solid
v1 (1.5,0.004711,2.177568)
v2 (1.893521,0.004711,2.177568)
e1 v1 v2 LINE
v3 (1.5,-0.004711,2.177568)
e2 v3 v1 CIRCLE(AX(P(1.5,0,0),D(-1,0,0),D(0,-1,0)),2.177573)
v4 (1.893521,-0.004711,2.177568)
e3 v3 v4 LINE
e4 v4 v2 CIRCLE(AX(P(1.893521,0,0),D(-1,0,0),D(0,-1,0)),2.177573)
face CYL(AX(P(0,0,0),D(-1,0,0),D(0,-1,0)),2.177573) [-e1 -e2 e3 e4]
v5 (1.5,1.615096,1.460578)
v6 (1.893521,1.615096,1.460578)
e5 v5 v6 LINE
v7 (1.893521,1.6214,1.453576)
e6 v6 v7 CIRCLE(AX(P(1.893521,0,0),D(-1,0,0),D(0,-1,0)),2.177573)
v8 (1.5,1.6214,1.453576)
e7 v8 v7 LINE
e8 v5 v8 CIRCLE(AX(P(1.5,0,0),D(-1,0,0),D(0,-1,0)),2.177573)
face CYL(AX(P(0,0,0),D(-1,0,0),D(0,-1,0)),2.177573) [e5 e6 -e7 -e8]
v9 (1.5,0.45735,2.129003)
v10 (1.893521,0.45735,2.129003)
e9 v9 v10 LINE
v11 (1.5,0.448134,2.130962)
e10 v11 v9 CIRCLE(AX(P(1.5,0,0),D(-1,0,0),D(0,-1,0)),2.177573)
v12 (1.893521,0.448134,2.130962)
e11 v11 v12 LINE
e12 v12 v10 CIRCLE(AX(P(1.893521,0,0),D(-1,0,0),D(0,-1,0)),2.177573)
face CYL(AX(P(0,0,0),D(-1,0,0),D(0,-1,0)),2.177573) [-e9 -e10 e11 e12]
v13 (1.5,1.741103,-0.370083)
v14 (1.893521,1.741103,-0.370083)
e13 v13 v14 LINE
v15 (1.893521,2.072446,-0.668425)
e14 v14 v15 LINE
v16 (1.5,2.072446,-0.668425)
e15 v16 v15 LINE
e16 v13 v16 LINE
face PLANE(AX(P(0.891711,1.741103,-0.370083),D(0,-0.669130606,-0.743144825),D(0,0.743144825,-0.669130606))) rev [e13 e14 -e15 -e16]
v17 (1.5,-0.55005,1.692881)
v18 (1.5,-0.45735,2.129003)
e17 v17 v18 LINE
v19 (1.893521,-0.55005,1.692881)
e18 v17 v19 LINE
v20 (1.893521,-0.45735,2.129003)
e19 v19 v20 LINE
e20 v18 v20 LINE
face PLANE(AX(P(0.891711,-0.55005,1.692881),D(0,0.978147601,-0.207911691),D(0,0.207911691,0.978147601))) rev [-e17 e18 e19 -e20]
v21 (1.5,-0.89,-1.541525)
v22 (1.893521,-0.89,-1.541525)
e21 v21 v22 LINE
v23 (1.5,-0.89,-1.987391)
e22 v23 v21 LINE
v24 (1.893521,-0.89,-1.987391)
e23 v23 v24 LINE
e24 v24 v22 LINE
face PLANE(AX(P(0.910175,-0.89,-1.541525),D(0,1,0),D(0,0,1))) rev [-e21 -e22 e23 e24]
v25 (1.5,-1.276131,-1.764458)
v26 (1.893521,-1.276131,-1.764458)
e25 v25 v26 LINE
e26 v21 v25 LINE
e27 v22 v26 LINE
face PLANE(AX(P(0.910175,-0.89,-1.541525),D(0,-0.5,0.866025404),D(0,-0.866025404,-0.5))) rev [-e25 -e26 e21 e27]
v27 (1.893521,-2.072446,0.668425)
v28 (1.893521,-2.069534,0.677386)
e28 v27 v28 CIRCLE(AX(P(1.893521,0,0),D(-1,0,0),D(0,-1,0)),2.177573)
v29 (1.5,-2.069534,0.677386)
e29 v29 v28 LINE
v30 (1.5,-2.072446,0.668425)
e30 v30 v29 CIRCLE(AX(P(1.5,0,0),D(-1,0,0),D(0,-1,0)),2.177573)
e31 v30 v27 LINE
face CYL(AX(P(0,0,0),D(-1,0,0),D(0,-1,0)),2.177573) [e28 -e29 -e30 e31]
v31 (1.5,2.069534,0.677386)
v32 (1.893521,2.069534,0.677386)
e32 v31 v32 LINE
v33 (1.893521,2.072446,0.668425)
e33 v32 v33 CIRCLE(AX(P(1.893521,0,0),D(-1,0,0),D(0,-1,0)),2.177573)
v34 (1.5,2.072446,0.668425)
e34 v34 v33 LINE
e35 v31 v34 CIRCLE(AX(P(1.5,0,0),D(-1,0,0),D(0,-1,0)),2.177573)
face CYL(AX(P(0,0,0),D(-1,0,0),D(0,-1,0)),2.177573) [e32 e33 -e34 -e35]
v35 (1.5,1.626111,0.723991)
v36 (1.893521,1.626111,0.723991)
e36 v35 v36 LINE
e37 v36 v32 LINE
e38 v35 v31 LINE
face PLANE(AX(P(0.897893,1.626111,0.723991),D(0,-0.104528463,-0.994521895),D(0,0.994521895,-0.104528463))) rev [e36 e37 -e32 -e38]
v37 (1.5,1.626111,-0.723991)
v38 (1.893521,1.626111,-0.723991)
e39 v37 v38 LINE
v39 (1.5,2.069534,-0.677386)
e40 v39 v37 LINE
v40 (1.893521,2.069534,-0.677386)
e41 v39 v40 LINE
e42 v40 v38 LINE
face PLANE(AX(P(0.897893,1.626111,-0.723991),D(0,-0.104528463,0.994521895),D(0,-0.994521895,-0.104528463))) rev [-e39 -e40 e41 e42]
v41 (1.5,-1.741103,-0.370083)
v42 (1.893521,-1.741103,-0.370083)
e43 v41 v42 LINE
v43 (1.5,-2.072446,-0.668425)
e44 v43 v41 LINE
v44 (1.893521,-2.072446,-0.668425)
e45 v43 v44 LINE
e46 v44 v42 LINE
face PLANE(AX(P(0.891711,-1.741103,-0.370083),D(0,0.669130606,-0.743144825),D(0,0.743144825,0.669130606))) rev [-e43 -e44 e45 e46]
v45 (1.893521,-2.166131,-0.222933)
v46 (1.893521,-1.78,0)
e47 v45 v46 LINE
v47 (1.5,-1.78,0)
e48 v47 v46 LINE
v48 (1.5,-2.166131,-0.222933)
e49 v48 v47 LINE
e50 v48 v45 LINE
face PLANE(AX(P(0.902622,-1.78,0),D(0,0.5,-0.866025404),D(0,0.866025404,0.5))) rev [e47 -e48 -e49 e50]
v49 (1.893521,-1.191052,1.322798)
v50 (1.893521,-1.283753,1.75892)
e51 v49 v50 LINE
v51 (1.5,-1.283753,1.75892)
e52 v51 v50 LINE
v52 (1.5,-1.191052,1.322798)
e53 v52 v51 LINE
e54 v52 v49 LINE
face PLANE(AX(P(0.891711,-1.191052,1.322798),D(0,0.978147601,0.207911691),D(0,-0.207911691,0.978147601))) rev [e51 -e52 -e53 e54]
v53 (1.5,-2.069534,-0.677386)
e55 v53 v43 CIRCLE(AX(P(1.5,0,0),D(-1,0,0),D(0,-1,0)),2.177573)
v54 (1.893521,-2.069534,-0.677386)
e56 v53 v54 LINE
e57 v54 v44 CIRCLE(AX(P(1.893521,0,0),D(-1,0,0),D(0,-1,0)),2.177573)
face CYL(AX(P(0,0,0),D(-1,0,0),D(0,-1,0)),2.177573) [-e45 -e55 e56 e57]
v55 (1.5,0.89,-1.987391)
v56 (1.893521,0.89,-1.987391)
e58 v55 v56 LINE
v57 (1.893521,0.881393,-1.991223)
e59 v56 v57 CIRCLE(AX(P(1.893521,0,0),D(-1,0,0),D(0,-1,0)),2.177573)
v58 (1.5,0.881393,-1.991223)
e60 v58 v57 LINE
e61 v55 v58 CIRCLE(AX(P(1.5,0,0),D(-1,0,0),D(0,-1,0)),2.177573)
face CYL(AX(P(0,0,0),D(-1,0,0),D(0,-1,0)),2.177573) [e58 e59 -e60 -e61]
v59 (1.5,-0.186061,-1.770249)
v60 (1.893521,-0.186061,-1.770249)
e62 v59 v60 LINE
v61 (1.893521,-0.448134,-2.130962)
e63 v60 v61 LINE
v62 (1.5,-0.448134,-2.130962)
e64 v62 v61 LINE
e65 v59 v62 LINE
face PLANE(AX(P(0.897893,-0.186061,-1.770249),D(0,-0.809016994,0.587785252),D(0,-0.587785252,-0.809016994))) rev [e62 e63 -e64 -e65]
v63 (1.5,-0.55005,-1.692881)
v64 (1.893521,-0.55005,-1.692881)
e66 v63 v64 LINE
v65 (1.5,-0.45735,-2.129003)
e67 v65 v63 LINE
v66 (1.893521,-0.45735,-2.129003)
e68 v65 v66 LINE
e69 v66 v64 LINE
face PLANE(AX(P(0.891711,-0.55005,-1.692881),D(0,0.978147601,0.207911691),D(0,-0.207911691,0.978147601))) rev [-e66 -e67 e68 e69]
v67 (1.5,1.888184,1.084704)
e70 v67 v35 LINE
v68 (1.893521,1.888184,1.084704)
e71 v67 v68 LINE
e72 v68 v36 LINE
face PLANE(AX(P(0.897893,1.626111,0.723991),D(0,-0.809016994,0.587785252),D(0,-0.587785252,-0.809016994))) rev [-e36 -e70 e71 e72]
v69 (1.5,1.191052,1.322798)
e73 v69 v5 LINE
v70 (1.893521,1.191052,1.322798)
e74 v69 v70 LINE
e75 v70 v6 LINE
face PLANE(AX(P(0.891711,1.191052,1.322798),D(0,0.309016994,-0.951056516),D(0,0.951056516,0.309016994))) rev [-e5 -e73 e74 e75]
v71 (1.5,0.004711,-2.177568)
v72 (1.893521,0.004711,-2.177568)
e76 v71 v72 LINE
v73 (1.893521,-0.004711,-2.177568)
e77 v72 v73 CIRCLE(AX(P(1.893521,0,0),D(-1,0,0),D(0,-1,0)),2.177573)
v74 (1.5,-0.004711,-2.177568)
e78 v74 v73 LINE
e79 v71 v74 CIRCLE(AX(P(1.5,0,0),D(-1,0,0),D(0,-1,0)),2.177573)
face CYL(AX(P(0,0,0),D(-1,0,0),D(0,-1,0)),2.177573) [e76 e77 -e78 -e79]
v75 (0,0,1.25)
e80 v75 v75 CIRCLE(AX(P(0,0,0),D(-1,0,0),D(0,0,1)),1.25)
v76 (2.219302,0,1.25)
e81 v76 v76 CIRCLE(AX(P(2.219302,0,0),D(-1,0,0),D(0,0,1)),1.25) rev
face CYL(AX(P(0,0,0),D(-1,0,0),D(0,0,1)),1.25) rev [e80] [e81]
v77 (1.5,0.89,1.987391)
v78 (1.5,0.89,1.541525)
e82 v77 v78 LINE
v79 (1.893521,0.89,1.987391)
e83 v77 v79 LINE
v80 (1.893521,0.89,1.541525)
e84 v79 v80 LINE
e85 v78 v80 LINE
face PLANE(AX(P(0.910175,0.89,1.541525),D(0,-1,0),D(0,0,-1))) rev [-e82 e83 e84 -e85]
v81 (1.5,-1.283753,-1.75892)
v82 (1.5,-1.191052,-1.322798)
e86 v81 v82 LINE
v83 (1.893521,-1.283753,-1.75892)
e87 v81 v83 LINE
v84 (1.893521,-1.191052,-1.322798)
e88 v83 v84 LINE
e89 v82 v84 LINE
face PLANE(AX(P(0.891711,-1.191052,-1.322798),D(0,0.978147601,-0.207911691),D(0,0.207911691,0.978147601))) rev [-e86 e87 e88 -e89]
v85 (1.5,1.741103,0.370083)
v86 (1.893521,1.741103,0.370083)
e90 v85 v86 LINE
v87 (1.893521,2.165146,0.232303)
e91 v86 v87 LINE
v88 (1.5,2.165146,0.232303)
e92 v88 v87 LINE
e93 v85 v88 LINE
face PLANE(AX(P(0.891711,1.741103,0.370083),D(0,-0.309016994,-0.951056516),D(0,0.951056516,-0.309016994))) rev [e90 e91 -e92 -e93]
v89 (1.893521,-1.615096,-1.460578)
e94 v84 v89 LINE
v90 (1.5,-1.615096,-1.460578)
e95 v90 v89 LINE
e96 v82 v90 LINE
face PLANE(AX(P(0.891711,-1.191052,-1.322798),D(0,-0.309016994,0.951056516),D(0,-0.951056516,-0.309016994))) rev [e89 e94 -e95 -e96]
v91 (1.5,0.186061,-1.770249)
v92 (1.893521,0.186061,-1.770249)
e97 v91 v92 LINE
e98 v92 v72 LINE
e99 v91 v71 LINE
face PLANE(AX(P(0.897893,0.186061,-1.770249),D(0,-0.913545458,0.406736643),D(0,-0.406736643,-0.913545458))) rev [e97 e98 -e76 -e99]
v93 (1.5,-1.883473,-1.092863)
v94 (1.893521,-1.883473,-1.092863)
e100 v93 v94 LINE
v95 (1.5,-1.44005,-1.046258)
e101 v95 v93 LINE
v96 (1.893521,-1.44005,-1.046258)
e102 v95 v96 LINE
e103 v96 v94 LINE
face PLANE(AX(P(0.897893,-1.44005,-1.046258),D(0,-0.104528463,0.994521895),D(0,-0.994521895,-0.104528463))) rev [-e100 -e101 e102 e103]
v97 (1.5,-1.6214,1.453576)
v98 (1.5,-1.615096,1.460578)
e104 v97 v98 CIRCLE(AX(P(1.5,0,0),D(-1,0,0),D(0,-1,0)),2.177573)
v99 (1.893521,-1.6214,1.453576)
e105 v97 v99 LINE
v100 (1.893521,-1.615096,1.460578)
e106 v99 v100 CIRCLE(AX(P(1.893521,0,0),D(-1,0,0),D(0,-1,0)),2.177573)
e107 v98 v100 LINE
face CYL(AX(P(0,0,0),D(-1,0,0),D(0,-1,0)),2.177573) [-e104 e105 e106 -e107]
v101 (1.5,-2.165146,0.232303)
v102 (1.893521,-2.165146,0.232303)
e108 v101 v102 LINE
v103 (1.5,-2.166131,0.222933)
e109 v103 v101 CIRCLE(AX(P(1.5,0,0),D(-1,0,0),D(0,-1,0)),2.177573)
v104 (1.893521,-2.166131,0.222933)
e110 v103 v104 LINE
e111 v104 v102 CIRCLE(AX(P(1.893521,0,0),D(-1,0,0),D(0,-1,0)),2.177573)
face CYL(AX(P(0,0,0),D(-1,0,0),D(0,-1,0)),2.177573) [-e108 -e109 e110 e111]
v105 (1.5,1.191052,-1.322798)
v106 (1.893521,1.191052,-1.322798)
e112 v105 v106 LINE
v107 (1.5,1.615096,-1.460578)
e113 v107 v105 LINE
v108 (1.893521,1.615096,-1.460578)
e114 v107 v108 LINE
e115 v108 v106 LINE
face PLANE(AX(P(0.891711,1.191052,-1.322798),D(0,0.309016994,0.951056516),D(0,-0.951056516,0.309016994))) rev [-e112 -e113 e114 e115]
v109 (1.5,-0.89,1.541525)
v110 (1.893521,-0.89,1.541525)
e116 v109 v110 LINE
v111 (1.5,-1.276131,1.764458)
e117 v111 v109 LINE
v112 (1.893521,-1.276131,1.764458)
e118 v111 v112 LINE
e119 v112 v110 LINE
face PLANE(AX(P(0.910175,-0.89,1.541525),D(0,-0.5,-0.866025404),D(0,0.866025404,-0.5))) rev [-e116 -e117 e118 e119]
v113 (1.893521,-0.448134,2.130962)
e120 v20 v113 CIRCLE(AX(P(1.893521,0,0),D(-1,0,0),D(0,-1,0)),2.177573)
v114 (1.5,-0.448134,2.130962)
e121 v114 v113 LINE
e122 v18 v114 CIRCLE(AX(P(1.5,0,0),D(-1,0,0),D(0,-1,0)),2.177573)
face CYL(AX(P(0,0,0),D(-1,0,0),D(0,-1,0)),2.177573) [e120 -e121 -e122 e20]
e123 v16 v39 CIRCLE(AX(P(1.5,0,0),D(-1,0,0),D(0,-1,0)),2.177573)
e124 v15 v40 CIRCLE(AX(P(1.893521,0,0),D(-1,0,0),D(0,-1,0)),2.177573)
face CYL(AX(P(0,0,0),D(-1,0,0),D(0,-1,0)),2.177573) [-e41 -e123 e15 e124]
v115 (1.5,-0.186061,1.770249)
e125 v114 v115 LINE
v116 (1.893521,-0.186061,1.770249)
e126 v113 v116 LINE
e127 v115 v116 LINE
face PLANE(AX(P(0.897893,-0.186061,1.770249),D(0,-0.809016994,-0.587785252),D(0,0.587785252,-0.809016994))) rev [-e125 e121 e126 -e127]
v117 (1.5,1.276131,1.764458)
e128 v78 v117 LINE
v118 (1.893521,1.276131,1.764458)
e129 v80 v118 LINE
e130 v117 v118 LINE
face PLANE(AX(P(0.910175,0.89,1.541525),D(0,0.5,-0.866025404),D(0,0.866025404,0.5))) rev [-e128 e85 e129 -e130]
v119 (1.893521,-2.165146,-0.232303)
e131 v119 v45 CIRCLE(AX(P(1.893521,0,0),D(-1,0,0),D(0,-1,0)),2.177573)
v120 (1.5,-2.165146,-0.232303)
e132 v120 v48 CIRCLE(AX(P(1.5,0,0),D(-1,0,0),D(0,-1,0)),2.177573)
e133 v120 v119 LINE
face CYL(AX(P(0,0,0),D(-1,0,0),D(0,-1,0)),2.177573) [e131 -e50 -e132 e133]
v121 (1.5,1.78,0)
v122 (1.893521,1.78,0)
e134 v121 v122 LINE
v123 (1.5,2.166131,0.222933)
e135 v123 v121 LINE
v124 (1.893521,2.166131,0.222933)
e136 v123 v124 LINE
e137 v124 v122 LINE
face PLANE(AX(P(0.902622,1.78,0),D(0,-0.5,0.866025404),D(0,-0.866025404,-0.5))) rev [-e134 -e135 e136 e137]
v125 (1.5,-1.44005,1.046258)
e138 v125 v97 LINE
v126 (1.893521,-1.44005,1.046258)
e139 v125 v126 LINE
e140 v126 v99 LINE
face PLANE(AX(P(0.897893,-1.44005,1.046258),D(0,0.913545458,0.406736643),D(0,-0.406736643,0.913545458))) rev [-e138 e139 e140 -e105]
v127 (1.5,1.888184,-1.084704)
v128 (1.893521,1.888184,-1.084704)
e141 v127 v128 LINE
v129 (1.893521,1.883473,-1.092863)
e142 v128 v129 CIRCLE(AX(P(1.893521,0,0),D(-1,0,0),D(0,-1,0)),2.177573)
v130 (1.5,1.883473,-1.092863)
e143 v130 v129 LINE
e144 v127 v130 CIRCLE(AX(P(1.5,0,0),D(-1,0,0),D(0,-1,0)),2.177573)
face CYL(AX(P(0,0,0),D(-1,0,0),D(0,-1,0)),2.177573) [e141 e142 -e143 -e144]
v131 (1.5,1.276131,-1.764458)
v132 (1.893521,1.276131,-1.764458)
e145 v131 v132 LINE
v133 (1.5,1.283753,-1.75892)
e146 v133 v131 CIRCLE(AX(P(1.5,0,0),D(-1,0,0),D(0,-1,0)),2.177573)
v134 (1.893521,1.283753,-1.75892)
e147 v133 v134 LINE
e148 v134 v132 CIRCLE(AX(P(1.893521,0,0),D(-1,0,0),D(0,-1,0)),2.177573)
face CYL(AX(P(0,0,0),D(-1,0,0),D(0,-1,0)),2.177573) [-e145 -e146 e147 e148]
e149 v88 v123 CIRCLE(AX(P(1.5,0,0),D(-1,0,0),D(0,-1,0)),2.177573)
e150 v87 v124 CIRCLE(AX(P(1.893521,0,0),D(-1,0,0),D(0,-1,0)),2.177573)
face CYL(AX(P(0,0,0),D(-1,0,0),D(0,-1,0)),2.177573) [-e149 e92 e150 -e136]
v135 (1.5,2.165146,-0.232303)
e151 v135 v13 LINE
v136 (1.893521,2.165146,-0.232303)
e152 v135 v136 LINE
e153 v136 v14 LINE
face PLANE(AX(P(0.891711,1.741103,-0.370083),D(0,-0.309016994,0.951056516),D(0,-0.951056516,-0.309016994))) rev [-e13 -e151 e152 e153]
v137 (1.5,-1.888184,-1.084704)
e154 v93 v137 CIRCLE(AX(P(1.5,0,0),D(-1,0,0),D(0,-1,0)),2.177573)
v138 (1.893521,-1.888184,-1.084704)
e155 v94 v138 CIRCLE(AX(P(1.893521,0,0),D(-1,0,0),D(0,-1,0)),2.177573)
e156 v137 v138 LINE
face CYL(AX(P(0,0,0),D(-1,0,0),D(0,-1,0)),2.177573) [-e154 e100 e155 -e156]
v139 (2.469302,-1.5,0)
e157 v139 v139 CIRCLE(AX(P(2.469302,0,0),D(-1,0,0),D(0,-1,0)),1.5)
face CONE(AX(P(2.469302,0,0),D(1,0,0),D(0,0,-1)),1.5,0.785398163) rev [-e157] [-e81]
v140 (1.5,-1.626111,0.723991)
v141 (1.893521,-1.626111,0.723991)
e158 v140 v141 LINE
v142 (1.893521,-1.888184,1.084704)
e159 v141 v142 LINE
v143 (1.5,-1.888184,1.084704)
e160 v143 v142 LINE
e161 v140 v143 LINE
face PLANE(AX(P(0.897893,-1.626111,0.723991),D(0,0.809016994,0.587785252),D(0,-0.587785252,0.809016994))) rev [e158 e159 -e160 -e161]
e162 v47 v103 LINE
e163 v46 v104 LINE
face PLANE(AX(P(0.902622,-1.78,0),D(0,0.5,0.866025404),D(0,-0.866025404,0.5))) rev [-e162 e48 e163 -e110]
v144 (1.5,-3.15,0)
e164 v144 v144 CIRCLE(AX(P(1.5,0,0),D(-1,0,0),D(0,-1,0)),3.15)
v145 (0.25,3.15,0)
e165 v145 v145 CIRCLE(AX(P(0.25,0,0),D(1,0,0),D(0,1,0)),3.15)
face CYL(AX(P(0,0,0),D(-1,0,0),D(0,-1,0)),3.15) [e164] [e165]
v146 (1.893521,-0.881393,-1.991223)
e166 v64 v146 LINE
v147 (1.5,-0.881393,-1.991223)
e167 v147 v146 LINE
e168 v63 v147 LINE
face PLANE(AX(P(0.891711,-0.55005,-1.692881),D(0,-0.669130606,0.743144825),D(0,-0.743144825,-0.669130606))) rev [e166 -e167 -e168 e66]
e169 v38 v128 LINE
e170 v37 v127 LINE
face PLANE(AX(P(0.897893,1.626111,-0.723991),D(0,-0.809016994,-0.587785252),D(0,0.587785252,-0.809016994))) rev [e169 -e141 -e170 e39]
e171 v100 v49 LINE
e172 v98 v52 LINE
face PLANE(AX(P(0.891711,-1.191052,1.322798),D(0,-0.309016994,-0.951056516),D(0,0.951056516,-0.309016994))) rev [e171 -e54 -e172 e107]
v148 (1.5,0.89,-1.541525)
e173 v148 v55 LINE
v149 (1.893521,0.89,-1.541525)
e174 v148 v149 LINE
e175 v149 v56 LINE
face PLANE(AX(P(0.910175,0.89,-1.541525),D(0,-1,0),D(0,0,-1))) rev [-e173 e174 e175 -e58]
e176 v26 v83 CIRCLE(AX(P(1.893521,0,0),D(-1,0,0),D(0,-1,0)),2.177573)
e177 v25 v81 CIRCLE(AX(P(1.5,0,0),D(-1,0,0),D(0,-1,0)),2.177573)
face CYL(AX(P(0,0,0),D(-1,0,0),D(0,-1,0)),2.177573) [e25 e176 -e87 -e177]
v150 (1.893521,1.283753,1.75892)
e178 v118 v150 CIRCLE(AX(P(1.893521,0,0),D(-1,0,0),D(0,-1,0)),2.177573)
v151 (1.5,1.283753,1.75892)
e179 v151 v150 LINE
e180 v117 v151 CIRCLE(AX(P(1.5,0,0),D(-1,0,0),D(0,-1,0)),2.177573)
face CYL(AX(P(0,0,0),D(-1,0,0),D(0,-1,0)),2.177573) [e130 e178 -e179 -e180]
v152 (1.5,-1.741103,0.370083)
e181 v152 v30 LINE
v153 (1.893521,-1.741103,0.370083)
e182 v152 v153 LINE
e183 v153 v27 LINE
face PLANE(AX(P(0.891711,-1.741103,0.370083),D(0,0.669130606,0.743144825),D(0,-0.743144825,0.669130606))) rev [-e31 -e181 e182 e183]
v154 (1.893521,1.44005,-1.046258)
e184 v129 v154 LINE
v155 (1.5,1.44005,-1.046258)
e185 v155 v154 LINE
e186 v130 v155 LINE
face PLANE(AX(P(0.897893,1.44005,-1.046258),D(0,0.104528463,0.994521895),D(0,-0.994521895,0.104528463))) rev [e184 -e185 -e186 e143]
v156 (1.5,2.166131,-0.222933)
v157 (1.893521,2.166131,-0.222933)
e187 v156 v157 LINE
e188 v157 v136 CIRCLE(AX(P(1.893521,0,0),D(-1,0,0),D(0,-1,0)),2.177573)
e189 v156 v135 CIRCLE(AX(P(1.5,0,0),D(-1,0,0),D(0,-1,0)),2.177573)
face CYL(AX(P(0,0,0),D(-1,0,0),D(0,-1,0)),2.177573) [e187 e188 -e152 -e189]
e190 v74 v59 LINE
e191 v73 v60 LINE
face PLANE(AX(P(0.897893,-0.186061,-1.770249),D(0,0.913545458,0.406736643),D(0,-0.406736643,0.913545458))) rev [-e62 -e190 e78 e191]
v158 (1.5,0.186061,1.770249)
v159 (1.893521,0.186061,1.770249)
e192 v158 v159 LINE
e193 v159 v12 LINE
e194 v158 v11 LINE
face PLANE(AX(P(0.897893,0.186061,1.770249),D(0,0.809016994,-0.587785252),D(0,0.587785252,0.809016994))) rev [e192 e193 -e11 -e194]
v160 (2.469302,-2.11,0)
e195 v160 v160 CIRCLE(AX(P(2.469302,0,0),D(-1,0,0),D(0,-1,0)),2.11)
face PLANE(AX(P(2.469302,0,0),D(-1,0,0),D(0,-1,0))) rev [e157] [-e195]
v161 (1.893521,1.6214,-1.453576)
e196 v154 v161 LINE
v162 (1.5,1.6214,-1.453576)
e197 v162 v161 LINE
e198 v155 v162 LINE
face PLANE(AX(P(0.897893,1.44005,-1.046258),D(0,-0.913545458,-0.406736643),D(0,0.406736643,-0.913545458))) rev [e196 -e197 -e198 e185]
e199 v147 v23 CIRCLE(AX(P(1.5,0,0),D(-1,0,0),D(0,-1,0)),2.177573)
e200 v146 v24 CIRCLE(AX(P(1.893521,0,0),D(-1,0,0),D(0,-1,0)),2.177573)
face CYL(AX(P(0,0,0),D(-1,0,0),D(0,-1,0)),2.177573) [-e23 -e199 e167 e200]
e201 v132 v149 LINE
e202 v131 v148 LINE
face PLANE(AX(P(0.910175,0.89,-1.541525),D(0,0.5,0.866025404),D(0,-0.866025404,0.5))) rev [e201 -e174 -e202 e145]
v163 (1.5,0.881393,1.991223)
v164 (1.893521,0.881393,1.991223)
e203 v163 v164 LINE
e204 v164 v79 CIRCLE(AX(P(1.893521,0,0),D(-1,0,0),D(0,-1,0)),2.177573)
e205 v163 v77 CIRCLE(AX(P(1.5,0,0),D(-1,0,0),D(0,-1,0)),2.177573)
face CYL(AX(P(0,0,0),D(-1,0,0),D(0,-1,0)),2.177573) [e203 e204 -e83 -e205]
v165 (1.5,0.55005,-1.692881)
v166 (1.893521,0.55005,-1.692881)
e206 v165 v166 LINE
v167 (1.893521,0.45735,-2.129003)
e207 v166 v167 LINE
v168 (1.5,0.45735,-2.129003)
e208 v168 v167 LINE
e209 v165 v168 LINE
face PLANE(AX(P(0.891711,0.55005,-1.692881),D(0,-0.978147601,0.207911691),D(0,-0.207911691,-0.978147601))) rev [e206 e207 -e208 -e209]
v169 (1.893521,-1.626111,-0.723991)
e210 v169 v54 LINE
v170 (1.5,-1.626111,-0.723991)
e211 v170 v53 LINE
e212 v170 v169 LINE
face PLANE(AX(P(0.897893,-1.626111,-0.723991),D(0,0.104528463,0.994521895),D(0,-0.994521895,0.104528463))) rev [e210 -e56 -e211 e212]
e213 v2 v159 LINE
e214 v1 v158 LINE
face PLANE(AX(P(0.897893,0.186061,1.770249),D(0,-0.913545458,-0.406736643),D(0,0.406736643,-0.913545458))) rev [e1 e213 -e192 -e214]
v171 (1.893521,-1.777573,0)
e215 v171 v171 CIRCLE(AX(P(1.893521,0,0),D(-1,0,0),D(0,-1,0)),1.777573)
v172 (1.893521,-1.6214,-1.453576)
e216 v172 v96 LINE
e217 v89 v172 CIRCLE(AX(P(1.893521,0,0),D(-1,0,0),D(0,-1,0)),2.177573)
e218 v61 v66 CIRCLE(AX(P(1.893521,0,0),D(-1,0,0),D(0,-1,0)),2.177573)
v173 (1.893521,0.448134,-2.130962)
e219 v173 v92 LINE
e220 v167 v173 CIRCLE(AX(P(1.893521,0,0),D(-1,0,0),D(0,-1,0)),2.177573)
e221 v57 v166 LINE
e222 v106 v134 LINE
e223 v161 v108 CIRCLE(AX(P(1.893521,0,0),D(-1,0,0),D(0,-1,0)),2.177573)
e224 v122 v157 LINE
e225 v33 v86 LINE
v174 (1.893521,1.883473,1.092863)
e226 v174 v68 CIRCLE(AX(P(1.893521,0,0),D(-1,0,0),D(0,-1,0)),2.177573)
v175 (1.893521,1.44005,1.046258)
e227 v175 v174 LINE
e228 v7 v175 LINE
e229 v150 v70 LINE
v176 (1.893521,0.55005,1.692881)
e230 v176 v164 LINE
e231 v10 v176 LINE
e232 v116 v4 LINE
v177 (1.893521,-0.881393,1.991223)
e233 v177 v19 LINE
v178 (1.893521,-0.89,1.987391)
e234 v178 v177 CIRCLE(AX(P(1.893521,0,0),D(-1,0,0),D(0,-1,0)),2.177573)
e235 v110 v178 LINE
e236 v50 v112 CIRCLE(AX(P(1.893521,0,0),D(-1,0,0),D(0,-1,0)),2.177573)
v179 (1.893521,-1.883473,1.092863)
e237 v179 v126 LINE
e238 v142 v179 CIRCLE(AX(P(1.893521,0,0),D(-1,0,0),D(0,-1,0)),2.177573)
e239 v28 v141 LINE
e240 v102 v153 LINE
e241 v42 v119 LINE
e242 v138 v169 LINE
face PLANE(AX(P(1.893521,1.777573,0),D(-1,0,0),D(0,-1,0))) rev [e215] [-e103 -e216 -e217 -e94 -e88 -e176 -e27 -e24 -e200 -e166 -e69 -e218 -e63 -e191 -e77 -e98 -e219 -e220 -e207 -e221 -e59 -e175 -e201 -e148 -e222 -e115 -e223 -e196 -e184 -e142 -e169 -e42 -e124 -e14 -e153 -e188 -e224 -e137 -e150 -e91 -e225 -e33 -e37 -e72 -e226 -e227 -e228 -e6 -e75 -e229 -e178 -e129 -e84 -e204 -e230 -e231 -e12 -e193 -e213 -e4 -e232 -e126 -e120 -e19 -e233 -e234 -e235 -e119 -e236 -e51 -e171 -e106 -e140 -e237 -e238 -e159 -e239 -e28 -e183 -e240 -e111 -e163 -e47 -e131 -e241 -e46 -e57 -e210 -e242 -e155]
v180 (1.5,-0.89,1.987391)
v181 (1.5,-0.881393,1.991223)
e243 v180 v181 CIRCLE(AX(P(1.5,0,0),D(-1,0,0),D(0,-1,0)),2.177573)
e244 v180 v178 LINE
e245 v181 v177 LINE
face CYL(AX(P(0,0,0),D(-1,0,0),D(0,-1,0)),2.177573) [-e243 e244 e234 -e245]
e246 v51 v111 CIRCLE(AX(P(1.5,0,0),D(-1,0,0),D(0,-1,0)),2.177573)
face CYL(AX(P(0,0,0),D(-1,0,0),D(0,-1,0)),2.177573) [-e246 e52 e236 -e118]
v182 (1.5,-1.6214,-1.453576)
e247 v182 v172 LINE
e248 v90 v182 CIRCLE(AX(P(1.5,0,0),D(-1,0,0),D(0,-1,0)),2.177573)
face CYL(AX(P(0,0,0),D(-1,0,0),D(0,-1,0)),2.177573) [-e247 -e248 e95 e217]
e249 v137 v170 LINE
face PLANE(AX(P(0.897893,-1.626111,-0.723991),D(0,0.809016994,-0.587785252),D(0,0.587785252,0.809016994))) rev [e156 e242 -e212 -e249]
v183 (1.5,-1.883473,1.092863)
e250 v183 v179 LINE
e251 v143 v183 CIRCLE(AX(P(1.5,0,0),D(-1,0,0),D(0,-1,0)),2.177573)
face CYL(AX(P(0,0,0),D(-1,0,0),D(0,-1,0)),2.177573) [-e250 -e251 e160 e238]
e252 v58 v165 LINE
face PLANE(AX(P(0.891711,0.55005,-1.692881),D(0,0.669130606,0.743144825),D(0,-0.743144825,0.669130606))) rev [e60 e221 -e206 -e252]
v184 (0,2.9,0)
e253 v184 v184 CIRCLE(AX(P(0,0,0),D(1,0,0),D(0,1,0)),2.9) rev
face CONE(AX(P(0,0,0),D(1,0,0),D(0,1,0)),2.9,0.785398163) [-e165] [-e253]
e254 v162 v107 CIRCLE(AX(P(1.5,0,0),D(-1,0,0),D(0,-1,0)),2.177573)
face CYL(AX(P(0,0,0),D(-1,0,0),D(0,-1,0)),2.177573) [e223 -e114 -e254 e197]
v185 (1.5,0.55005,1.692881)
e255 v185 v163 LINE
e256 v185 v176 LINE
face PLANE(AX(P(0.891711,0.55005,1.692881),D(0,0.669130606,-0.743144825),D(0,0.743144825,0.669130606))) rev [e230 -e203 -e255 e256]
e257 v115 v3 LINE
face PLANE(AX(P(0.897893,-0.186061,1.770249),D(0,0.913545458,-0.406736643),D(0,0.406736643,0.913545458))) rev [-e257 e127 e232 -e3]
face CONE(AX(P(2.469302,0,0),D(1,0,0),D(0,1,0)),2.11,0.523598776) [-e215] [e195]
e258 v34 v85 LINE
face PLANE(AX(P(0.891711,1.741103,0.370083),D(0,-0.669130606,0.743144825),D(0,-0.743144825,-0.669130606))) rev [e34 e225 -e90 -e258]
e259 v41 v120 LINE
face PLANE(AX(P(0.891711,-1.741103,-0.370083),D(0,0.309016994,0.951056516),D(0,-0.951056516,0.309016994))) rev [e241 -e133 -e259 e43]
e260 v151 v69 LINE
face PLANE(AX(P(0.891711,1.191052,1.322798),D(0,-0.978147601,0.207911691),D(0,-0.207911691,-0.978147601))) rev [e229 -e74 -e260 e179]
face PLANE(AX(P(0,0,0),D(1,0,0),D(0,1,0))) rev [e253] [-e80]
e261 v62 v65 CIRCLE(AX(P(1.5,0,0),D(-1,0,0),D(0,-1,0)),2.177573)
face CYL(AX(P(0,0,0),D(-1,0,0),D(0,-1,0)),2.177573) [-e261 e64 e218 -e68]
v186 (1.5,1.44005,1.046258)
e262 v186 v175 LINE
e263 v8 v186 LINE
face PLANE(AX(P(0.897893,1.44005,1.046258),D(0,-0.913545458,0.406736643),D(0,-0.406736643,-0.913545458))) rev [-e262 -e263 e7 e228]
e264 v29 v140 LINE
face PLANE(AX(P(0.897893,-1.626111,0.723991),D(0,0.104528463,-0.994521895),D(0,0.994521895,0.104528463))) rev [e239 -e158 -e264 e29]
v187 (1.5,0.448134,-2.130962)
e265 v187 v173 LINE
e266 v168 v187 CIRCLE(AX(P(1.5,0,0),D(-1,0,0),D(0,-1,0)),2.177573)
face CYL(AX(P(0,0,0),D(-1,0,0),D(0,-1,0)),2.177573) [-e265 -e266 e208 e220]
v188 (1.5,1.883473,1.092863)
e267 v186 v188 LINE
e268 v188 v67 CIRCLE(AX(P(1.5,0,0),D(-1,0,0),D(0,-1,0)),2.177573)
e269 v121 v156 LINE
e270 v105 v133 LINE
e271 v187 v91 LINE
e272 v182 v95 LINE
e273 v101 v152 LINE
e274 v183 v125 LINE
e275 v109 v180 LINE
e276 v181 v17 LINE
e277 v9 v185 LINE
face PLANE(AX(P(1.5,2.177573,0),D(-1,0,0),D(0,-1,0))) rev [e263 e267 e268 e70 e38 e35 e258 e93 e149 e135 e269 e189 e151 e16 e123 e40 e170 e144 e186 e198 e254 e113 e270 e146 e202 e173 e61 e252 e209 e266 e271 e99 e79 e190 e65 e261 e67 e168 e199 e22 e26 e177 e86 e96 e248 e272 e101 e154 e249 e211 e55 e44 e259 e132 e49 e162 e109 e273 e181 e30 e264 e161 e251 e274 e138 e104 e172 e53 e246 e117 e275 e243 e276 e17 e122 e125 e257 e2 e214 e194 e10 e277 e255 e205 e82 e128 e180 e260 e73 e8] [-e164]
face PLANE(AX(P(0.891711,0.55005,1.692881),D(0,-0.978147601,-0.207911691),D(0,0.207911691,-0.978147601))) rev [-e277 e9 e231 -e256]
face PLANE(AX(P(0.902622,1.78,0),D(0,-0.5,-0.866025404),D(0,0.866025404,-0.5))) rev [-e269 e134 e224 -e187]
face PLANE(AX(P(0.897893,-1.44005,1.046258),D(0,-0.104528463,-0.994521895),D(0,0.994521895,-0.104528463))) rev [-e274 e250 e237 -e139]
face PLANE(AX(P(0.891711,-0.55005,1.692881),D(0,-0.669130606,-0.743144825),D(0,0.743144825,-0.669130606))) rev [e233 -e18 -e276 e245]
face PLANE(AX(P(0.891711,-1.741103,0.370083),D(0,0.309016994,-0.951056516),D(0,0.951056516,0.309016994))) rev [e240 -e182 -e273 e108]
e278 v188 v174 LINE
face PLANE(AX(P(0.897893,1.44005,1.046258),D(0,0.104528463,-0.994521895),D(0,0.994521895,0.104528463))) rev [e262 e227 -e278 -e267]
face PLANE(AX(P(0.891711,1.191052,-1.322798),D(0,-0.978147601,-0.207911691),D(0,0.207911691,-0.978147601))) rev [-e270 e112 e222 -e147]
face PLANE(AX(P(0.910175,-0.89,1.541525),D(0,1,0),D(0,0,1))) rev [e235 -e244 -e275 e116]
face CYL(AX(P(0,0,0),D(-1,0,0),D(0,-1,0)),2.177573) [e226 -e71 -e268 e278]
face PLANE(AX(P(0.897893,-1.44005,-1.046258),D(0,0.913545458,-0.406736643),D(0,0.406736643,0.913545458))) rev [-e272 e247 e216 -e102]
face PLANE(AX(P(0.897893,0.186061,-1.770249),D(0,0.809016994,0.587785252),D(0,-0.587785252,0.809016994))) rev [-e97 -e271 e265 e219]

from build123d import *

# Parameters (mm, degrees)
CUT_EXTRUDE_1_DEPTH      = 0.393521224
PATTERN_START            = 1.5
PATTERN_CIRCULAR_1_DEPTH = 0.393521224
HOLE_WIZARD_M31_D        = 2.5
HOLE_WIZARD_M31_DEPTH    = 8.5
HOLE_WIZARD_M31_TIP      = 0.751075774
CHAMFER_3_SIZE           = 0.25
CHAMFER_4_SIZE           = 0.25


# Read off the part's stored shape, not the designer's step: Круговой массив1
with BuildPart() as part:
    # Эскиз1 → Повернуть1 (revolve)
    with BuildSketch(Plane.XY, mode=Mode.PRIVATE) as revolve_1_sk:
        Polygon((0, 0), (0, 3.15), (1.5, 3.15), (1.5, 2.177572634), (1.893521224, 2.177572634), (1.893521224, 1.777572634), (2.469302313, 2.11), (2.469302313, 0), align=None)
    revolve(revolve_1_sk.sketch.rotate(Axis((0, 0, 0), (1, 0, 0)), 180), axis=Axis((0, 0, 0), (1, 0, 0)))

    # Эскиз2 → Вырез-Вытянуть1 (cut)
    with BuildSketch(Plane(origin=(1.893521224, 0, 0), x_dir=(0, 0, -1), z_dir=(1, 0, 0))):
        with BuildLine():
            Line((0, 1.78), (-0.222932839, 2.166131003))
            ThreePointArc((-0.222932839, 2.166131003), (0, 2.177572634), (0.222932839, 2.166131003))
            Line((0.222932839, 2.166131003), (0, 1.78))
        make_face()
    extrude(amount=-CUT_EXTRUDE_1_DEPTH, mode=Mode.SUBTRACT)

    # Круговой массив1 outline → Круговой массив1 (cut)
    with BuildSketch(Plane.YZ.offset(PATTERN_START)):
        with BuildLine():
            Line((-0.89, -1.987390896), (-0.89, -1.541525219))
            Line((-0.89, -1.541525219), (-1.276131004, -1.764458058))
            ThreePointArc((-1.276131004, -1.764458058), (-1.088786317, -1.885833219), (-0.89, -1.987390896))
        make_face()
        with BuildLine():
            Line((1.741102729, -0.37008281), (2.0724455, -0.668425181))
            ThreePointArc((2.0724455, -0.668425181), (2.129987447, -0.452742808), (2.165146187, -0.232302738))
            Line((2.165146187, -0.232302738), (1.741102729, -0.37008281))
        make_face()
        with BuildLine():
            Line((1.626110915, -0.723991225), (1.888184184, -1.084704135))
            ThreePointArc((1.888184184, -1.084704135), (1.989311588, -0.885698583), (2.069534093, -0.677385571))
            Line((2.069534093, -0.677385571), (1.626110915, -0.723991225))
        make_face()
        with BuildLine():
            Line((1.44005025, -1.046257749), (1.621400159, -1.453576313))
            ThreePointArc((1.621400159, -1.453576313), (1.761693267, -1.279945079), (1.883473429, -1.092863403))
            Line((1.883473429, -1.092863403), (1.44005025, -1.046257749))
        make_face()
        with BuildLine():
            Line((1.191052479, -1.322797789), (1.283753166, -1.758920232))
            ThreePointArc((1.283753166, -1.758920232), (1.457080496, -1.618251835), (1.615095937, -1.460577861))
            Line((1.615095937, -1.460577861), (1.191052479, -1.322797789))
        make_face()
        with BuildLine():
            Line((0.89, -1.541525219), (0.89, -1.987390896))
            ThreePointArc((0.89, -1.987390896), (1.088786317, -1.885833219), (1.276131003, -1.764458057))
            Line((1.276131003, -1.764458057), (0.89, -1.541525219))
        make_face()
        with BuildLine():
            Line((0.55005025, -1.692880599), (0.457349563, -2.129003042))
            ThreePointArc((0.457349563, -2.129003042), (0.67290695, -2.070994643), (0.881393021, -1.99122297))
            Line((0.881393021, -1.99122297), (0.55005025, -1.692880599))
        make_face()
        with BuildLine():
            Line((0.186060665, -1.770248974), (0.004710756, -2.177567538))
            ThreePointArc((0.004710756, -2.177567538), (0.227618321, -2.165643663), (0.448133934, -2.130961884))
            Line((0.448133934, -2.130961884), (0.186060665, -1.770248974))
        make_face()
        with BuildLine():
            Line((-0.186060665, -1.770248974), (-0.448133934, -2.130961884))
            ThreePointArc((-0.448133934, -2.130961884), (-0.227618321, -2.165643663), (-0.004710756, -2.177567538))
            Line((-0.004710756, -2.177567538), (-0.186060665, -1.770248974))
        make_face()
        with BuildLine():
            Line((-0.55005025, -1.692880599), (-0.881393021, -1.99122297))
            ThreePointArc((-0.881393021, -1.99122297), (-0.67290695, -2.070994643), (-0.457349563, -2.129003042))
            Line((-0.457349563, -2.129003042), (-0.55005025, -1.692880599))
        make_face()
        with BuildLine():
            ThreePointArc((2.165146187, 0.232302738), (2.129987447, 0.452742808), (2.0724455, 0.668425181))
            Line((2.0724455, 0.668425181), (1.741102729, 0.37008281))
            Line((1.741102729, 0.37008281), (2.165146187, 0.232302738))
        make_face()
        with BuildLine():
            ThreePointArc((2.069534093, 0.677385571), (1.989311588, 0.885698583), (1.888184184, 1.084704135))
            Line((1.888184184, 1.084704135), (1.626110915, 0.723991225))
            Line((1.626110915, 0.723991225), (2.069534093, 0.677385571))
        make_face()
        with BuildLine():
            ThreePointArc((1.883473429, 1.092863403), (1.761693267, 1.279945079), (1.621400159, 1.453576313))
            Line((1.621400159, 1.453576313), (1.44005025, 1.046257749))
            Line((1.44005025, 1.046257749), (1.883473429, 1.092863403))
        make_face()
        with BuildLine():
            ThreePointArc((1.615095937, 1.460577861), (1.457080496, 1.618251835), (1.283753166, 1.758920232))
            Line((1.283753166, 1.758920232), (1.191052479, 1.322797789))
            Line((1.191052479, 1.322797789), (1.615095937, 1.460577861))
        make_face()
        with BuildLine():
            ThreePointArc((1.276131003, 1.764458057), (1.088786317, 1.885833219), (0.89, 1.987390896))
            Line((0.89, 1.987390896), (0.89, 1.541525219))
            Line((0.89, 1.541525219), (1.276131003, 1.764458057))
        make_face()
        with BuildLine():
            ThreePointArc((0.881393021, 1.99122297), (0.67290695, 2.070994643), (0.457349563, 2.129003042))
            Line((0.457349563, 2.129003042), (0.55005025, 1.692880599))
            Line((0.55005025, 1.692880599), (0.881393021, 1.99122297))
        make_face()
        with BuildLine():
            ThreePointArc((0.448133934, 2.130961884), (0.227618321, 2.165643663), (0.004710756, 2.177567538))
            Line((0.004710756, 2.177567538), (0.186060665, 1.770248974))
            Line((0.186060665, 1.770248974), (0.448133934, 2.130961884))
        make_face()
        with BuildLine():
            ThreePointArc((-0.004710756, 2.177567538), (-0.227618321, 2.165643663), (-0.448133934, 2.130961884))
            Line((-0.448133934, 2.130961884), (-0.186060665, 1.770248974))
            Line((-0.186060665, 1.770248974), (-0.004710756, 2.177567538))
        make_face()
        with BuildLine():
            ThreePointArc((-0.457349563, 2.129003042), (-0.67290695, 2.070994643), (-0.881393021, 1.99122297))
            Line((-0.881393021, 1.99122297), (-0.55005025, 1.692880599))
            Line((-0.55005025, 1.692880599), (-0.457349563, 2.129003042))
        make_face()
        with BuildLine():
            ThreePointArc((-0.89, 1.987390896), (-1.088786317, 1.885833219), (-1.276131004, 1.764458058))
            Line((-1.276131004, 1.764458058), (-0.89, 1.541525219))
            Line((-0.89, 1.541525219), (-0.89, 1.987390896))
        make_face()
        with BuildLine():
            ThreePointArc((-1.283753166, 1.758920232), (-1.457080497, 1.618251835), (-1.615095937, 1.460577861))
            Line((-1.615095937, 1.460577861), (-1.191052479, 1.322797789))
            Line((-1.191052479, 1.322797789), (-1.283753166, 1.758920232))
        make_face()
        with BuildLine():
            ThreePointArc((-1.621400159, 1.453576313), (-1.761693268, 1.27994508), (-1.883473429, 1.092863403))
            Line((-1.883473429, 1.092863403), (-1.44005025, 1.046257749))
            Line((-1.44005025, 1.046257749), (-1.621400159, 1.453576313))
        make_face()
        with BuildLine():
            ThreePointArc((-1.888184185, 1.084704135), (-1.989311588, 0.885698583), (-2.069534094, 0.677385571))
            Line((-2.069534094, 0.677385571), (-1.626110915, 0.723991225))
            Line((-1.626110915, 0.723991225), (-1.888184185, 1.084704135))
        make_face()
        with BuildLine():
            ThreePointArc((-2.072445501, 0.668425181), (-2.129987447, 0.452742808), (-2.165146188, 0.232302738))
            Line((-2.165146188, 0.232302738), (-1.741102729, 0.37008281))
            Line((-1.741102729, 0.37008281), (-2.072445501, 0.668425181))
        make_face()
        with BuildLine():
            ThreePointArc((-2.166131004, 0.222932839), (-2.177572634, 0), (-2.166131004, -0.222932839))
            Line((-2.166131004, -0.222932839), (-1.78, 0))
            Line((-1.78, 0), (-2.166131004, 0.222932839))
        make_face()
        with BuildLine():
            ThreePointArc((-2.165146188, -0.232302738), (-2.129987447, -0.452742808), (-2.072445501, -0.668425181))
            Line((-2.072445501, -0.668425181), (-1.741102729, -0.37008281))
            Line((-1.741102729, -0.37008281), (-2.165146188, -0.232302738))
        make_face()
        with BuildLine():
            ThreePointArc((-2.069534094, -0.677385571), (-1.989311588, -0.885698583), (-1.888184185, -1.084704135))
            Line((-1.888184185, -1.084704135), (-1.626110915, -0.723991225))
            Line((-1.626110915, -0.723991225), (-2.069534094, -0.677385571))
        make_face()
        with BuildLine():
            ThreePointArc((-1.883473429, -1.092863403), (-1.761693268, -1.27994508), (-1.621400159, -1.453576313))
            Line((-1.621400159, -1.453576313), (-1.44005025, -1.046257749))
            Line((-1.44005025, -1.046257749), (-1.883473429, -1.092863403))
        make_face()
        with BuildLine():
            ThreePointArc((-1.615095937, -1.460577861), (-1.457080497, -1.618251835), (-1.283753166, -1.758920232))
            Line((-1.283753166, -1.758920232), (-1.191052479, -1.322797789))
            Line((-1.191052479, -1.322797789), (-1.615095937, -1.460577861))
        make_face()
    extrude(amount=PATTERN_CIRCULAR_1_DEPTH, mode=Mode.SUBTRACT)

    # Отверстие обработанное метчиком M31
    with Locations(Plane.ZY):
        with Locations((0, 0)):
            Hole(HOLE_WIZARD_M31_D / 2, depth=HOLE_WIZARD_M31_DEPTH)
            with Locations((0, 0, -(HOLE_WIZARD_M31_DEPTH + HOLE_WIZARD_M31_TIP / 2))):  # 118° drill point
                Cone(0, HOLE_WIZARD_M31_D / 2, HOLE_WIZARD_M31_TIP, mode=Mode.SUBTRACT)

    # Фаска3
    chamfer_3_edges = [part.edges().sort_by_distance(p)[0] for p in [
        (2.469302313, 0, 1.25),
    ]]
    chamfer(chamfer_3_edges, length=CHAMFER_3_SIZE)

    # Фаска4
    chamfer_4_edges = [part.edges().sort_by_distance(p)[0] for p in [
        (0, 3.15, 0),
    ]]
    chamfer(chamfer_4_edges, length=CHAMFER_4_SIZE)


solid = part.part
